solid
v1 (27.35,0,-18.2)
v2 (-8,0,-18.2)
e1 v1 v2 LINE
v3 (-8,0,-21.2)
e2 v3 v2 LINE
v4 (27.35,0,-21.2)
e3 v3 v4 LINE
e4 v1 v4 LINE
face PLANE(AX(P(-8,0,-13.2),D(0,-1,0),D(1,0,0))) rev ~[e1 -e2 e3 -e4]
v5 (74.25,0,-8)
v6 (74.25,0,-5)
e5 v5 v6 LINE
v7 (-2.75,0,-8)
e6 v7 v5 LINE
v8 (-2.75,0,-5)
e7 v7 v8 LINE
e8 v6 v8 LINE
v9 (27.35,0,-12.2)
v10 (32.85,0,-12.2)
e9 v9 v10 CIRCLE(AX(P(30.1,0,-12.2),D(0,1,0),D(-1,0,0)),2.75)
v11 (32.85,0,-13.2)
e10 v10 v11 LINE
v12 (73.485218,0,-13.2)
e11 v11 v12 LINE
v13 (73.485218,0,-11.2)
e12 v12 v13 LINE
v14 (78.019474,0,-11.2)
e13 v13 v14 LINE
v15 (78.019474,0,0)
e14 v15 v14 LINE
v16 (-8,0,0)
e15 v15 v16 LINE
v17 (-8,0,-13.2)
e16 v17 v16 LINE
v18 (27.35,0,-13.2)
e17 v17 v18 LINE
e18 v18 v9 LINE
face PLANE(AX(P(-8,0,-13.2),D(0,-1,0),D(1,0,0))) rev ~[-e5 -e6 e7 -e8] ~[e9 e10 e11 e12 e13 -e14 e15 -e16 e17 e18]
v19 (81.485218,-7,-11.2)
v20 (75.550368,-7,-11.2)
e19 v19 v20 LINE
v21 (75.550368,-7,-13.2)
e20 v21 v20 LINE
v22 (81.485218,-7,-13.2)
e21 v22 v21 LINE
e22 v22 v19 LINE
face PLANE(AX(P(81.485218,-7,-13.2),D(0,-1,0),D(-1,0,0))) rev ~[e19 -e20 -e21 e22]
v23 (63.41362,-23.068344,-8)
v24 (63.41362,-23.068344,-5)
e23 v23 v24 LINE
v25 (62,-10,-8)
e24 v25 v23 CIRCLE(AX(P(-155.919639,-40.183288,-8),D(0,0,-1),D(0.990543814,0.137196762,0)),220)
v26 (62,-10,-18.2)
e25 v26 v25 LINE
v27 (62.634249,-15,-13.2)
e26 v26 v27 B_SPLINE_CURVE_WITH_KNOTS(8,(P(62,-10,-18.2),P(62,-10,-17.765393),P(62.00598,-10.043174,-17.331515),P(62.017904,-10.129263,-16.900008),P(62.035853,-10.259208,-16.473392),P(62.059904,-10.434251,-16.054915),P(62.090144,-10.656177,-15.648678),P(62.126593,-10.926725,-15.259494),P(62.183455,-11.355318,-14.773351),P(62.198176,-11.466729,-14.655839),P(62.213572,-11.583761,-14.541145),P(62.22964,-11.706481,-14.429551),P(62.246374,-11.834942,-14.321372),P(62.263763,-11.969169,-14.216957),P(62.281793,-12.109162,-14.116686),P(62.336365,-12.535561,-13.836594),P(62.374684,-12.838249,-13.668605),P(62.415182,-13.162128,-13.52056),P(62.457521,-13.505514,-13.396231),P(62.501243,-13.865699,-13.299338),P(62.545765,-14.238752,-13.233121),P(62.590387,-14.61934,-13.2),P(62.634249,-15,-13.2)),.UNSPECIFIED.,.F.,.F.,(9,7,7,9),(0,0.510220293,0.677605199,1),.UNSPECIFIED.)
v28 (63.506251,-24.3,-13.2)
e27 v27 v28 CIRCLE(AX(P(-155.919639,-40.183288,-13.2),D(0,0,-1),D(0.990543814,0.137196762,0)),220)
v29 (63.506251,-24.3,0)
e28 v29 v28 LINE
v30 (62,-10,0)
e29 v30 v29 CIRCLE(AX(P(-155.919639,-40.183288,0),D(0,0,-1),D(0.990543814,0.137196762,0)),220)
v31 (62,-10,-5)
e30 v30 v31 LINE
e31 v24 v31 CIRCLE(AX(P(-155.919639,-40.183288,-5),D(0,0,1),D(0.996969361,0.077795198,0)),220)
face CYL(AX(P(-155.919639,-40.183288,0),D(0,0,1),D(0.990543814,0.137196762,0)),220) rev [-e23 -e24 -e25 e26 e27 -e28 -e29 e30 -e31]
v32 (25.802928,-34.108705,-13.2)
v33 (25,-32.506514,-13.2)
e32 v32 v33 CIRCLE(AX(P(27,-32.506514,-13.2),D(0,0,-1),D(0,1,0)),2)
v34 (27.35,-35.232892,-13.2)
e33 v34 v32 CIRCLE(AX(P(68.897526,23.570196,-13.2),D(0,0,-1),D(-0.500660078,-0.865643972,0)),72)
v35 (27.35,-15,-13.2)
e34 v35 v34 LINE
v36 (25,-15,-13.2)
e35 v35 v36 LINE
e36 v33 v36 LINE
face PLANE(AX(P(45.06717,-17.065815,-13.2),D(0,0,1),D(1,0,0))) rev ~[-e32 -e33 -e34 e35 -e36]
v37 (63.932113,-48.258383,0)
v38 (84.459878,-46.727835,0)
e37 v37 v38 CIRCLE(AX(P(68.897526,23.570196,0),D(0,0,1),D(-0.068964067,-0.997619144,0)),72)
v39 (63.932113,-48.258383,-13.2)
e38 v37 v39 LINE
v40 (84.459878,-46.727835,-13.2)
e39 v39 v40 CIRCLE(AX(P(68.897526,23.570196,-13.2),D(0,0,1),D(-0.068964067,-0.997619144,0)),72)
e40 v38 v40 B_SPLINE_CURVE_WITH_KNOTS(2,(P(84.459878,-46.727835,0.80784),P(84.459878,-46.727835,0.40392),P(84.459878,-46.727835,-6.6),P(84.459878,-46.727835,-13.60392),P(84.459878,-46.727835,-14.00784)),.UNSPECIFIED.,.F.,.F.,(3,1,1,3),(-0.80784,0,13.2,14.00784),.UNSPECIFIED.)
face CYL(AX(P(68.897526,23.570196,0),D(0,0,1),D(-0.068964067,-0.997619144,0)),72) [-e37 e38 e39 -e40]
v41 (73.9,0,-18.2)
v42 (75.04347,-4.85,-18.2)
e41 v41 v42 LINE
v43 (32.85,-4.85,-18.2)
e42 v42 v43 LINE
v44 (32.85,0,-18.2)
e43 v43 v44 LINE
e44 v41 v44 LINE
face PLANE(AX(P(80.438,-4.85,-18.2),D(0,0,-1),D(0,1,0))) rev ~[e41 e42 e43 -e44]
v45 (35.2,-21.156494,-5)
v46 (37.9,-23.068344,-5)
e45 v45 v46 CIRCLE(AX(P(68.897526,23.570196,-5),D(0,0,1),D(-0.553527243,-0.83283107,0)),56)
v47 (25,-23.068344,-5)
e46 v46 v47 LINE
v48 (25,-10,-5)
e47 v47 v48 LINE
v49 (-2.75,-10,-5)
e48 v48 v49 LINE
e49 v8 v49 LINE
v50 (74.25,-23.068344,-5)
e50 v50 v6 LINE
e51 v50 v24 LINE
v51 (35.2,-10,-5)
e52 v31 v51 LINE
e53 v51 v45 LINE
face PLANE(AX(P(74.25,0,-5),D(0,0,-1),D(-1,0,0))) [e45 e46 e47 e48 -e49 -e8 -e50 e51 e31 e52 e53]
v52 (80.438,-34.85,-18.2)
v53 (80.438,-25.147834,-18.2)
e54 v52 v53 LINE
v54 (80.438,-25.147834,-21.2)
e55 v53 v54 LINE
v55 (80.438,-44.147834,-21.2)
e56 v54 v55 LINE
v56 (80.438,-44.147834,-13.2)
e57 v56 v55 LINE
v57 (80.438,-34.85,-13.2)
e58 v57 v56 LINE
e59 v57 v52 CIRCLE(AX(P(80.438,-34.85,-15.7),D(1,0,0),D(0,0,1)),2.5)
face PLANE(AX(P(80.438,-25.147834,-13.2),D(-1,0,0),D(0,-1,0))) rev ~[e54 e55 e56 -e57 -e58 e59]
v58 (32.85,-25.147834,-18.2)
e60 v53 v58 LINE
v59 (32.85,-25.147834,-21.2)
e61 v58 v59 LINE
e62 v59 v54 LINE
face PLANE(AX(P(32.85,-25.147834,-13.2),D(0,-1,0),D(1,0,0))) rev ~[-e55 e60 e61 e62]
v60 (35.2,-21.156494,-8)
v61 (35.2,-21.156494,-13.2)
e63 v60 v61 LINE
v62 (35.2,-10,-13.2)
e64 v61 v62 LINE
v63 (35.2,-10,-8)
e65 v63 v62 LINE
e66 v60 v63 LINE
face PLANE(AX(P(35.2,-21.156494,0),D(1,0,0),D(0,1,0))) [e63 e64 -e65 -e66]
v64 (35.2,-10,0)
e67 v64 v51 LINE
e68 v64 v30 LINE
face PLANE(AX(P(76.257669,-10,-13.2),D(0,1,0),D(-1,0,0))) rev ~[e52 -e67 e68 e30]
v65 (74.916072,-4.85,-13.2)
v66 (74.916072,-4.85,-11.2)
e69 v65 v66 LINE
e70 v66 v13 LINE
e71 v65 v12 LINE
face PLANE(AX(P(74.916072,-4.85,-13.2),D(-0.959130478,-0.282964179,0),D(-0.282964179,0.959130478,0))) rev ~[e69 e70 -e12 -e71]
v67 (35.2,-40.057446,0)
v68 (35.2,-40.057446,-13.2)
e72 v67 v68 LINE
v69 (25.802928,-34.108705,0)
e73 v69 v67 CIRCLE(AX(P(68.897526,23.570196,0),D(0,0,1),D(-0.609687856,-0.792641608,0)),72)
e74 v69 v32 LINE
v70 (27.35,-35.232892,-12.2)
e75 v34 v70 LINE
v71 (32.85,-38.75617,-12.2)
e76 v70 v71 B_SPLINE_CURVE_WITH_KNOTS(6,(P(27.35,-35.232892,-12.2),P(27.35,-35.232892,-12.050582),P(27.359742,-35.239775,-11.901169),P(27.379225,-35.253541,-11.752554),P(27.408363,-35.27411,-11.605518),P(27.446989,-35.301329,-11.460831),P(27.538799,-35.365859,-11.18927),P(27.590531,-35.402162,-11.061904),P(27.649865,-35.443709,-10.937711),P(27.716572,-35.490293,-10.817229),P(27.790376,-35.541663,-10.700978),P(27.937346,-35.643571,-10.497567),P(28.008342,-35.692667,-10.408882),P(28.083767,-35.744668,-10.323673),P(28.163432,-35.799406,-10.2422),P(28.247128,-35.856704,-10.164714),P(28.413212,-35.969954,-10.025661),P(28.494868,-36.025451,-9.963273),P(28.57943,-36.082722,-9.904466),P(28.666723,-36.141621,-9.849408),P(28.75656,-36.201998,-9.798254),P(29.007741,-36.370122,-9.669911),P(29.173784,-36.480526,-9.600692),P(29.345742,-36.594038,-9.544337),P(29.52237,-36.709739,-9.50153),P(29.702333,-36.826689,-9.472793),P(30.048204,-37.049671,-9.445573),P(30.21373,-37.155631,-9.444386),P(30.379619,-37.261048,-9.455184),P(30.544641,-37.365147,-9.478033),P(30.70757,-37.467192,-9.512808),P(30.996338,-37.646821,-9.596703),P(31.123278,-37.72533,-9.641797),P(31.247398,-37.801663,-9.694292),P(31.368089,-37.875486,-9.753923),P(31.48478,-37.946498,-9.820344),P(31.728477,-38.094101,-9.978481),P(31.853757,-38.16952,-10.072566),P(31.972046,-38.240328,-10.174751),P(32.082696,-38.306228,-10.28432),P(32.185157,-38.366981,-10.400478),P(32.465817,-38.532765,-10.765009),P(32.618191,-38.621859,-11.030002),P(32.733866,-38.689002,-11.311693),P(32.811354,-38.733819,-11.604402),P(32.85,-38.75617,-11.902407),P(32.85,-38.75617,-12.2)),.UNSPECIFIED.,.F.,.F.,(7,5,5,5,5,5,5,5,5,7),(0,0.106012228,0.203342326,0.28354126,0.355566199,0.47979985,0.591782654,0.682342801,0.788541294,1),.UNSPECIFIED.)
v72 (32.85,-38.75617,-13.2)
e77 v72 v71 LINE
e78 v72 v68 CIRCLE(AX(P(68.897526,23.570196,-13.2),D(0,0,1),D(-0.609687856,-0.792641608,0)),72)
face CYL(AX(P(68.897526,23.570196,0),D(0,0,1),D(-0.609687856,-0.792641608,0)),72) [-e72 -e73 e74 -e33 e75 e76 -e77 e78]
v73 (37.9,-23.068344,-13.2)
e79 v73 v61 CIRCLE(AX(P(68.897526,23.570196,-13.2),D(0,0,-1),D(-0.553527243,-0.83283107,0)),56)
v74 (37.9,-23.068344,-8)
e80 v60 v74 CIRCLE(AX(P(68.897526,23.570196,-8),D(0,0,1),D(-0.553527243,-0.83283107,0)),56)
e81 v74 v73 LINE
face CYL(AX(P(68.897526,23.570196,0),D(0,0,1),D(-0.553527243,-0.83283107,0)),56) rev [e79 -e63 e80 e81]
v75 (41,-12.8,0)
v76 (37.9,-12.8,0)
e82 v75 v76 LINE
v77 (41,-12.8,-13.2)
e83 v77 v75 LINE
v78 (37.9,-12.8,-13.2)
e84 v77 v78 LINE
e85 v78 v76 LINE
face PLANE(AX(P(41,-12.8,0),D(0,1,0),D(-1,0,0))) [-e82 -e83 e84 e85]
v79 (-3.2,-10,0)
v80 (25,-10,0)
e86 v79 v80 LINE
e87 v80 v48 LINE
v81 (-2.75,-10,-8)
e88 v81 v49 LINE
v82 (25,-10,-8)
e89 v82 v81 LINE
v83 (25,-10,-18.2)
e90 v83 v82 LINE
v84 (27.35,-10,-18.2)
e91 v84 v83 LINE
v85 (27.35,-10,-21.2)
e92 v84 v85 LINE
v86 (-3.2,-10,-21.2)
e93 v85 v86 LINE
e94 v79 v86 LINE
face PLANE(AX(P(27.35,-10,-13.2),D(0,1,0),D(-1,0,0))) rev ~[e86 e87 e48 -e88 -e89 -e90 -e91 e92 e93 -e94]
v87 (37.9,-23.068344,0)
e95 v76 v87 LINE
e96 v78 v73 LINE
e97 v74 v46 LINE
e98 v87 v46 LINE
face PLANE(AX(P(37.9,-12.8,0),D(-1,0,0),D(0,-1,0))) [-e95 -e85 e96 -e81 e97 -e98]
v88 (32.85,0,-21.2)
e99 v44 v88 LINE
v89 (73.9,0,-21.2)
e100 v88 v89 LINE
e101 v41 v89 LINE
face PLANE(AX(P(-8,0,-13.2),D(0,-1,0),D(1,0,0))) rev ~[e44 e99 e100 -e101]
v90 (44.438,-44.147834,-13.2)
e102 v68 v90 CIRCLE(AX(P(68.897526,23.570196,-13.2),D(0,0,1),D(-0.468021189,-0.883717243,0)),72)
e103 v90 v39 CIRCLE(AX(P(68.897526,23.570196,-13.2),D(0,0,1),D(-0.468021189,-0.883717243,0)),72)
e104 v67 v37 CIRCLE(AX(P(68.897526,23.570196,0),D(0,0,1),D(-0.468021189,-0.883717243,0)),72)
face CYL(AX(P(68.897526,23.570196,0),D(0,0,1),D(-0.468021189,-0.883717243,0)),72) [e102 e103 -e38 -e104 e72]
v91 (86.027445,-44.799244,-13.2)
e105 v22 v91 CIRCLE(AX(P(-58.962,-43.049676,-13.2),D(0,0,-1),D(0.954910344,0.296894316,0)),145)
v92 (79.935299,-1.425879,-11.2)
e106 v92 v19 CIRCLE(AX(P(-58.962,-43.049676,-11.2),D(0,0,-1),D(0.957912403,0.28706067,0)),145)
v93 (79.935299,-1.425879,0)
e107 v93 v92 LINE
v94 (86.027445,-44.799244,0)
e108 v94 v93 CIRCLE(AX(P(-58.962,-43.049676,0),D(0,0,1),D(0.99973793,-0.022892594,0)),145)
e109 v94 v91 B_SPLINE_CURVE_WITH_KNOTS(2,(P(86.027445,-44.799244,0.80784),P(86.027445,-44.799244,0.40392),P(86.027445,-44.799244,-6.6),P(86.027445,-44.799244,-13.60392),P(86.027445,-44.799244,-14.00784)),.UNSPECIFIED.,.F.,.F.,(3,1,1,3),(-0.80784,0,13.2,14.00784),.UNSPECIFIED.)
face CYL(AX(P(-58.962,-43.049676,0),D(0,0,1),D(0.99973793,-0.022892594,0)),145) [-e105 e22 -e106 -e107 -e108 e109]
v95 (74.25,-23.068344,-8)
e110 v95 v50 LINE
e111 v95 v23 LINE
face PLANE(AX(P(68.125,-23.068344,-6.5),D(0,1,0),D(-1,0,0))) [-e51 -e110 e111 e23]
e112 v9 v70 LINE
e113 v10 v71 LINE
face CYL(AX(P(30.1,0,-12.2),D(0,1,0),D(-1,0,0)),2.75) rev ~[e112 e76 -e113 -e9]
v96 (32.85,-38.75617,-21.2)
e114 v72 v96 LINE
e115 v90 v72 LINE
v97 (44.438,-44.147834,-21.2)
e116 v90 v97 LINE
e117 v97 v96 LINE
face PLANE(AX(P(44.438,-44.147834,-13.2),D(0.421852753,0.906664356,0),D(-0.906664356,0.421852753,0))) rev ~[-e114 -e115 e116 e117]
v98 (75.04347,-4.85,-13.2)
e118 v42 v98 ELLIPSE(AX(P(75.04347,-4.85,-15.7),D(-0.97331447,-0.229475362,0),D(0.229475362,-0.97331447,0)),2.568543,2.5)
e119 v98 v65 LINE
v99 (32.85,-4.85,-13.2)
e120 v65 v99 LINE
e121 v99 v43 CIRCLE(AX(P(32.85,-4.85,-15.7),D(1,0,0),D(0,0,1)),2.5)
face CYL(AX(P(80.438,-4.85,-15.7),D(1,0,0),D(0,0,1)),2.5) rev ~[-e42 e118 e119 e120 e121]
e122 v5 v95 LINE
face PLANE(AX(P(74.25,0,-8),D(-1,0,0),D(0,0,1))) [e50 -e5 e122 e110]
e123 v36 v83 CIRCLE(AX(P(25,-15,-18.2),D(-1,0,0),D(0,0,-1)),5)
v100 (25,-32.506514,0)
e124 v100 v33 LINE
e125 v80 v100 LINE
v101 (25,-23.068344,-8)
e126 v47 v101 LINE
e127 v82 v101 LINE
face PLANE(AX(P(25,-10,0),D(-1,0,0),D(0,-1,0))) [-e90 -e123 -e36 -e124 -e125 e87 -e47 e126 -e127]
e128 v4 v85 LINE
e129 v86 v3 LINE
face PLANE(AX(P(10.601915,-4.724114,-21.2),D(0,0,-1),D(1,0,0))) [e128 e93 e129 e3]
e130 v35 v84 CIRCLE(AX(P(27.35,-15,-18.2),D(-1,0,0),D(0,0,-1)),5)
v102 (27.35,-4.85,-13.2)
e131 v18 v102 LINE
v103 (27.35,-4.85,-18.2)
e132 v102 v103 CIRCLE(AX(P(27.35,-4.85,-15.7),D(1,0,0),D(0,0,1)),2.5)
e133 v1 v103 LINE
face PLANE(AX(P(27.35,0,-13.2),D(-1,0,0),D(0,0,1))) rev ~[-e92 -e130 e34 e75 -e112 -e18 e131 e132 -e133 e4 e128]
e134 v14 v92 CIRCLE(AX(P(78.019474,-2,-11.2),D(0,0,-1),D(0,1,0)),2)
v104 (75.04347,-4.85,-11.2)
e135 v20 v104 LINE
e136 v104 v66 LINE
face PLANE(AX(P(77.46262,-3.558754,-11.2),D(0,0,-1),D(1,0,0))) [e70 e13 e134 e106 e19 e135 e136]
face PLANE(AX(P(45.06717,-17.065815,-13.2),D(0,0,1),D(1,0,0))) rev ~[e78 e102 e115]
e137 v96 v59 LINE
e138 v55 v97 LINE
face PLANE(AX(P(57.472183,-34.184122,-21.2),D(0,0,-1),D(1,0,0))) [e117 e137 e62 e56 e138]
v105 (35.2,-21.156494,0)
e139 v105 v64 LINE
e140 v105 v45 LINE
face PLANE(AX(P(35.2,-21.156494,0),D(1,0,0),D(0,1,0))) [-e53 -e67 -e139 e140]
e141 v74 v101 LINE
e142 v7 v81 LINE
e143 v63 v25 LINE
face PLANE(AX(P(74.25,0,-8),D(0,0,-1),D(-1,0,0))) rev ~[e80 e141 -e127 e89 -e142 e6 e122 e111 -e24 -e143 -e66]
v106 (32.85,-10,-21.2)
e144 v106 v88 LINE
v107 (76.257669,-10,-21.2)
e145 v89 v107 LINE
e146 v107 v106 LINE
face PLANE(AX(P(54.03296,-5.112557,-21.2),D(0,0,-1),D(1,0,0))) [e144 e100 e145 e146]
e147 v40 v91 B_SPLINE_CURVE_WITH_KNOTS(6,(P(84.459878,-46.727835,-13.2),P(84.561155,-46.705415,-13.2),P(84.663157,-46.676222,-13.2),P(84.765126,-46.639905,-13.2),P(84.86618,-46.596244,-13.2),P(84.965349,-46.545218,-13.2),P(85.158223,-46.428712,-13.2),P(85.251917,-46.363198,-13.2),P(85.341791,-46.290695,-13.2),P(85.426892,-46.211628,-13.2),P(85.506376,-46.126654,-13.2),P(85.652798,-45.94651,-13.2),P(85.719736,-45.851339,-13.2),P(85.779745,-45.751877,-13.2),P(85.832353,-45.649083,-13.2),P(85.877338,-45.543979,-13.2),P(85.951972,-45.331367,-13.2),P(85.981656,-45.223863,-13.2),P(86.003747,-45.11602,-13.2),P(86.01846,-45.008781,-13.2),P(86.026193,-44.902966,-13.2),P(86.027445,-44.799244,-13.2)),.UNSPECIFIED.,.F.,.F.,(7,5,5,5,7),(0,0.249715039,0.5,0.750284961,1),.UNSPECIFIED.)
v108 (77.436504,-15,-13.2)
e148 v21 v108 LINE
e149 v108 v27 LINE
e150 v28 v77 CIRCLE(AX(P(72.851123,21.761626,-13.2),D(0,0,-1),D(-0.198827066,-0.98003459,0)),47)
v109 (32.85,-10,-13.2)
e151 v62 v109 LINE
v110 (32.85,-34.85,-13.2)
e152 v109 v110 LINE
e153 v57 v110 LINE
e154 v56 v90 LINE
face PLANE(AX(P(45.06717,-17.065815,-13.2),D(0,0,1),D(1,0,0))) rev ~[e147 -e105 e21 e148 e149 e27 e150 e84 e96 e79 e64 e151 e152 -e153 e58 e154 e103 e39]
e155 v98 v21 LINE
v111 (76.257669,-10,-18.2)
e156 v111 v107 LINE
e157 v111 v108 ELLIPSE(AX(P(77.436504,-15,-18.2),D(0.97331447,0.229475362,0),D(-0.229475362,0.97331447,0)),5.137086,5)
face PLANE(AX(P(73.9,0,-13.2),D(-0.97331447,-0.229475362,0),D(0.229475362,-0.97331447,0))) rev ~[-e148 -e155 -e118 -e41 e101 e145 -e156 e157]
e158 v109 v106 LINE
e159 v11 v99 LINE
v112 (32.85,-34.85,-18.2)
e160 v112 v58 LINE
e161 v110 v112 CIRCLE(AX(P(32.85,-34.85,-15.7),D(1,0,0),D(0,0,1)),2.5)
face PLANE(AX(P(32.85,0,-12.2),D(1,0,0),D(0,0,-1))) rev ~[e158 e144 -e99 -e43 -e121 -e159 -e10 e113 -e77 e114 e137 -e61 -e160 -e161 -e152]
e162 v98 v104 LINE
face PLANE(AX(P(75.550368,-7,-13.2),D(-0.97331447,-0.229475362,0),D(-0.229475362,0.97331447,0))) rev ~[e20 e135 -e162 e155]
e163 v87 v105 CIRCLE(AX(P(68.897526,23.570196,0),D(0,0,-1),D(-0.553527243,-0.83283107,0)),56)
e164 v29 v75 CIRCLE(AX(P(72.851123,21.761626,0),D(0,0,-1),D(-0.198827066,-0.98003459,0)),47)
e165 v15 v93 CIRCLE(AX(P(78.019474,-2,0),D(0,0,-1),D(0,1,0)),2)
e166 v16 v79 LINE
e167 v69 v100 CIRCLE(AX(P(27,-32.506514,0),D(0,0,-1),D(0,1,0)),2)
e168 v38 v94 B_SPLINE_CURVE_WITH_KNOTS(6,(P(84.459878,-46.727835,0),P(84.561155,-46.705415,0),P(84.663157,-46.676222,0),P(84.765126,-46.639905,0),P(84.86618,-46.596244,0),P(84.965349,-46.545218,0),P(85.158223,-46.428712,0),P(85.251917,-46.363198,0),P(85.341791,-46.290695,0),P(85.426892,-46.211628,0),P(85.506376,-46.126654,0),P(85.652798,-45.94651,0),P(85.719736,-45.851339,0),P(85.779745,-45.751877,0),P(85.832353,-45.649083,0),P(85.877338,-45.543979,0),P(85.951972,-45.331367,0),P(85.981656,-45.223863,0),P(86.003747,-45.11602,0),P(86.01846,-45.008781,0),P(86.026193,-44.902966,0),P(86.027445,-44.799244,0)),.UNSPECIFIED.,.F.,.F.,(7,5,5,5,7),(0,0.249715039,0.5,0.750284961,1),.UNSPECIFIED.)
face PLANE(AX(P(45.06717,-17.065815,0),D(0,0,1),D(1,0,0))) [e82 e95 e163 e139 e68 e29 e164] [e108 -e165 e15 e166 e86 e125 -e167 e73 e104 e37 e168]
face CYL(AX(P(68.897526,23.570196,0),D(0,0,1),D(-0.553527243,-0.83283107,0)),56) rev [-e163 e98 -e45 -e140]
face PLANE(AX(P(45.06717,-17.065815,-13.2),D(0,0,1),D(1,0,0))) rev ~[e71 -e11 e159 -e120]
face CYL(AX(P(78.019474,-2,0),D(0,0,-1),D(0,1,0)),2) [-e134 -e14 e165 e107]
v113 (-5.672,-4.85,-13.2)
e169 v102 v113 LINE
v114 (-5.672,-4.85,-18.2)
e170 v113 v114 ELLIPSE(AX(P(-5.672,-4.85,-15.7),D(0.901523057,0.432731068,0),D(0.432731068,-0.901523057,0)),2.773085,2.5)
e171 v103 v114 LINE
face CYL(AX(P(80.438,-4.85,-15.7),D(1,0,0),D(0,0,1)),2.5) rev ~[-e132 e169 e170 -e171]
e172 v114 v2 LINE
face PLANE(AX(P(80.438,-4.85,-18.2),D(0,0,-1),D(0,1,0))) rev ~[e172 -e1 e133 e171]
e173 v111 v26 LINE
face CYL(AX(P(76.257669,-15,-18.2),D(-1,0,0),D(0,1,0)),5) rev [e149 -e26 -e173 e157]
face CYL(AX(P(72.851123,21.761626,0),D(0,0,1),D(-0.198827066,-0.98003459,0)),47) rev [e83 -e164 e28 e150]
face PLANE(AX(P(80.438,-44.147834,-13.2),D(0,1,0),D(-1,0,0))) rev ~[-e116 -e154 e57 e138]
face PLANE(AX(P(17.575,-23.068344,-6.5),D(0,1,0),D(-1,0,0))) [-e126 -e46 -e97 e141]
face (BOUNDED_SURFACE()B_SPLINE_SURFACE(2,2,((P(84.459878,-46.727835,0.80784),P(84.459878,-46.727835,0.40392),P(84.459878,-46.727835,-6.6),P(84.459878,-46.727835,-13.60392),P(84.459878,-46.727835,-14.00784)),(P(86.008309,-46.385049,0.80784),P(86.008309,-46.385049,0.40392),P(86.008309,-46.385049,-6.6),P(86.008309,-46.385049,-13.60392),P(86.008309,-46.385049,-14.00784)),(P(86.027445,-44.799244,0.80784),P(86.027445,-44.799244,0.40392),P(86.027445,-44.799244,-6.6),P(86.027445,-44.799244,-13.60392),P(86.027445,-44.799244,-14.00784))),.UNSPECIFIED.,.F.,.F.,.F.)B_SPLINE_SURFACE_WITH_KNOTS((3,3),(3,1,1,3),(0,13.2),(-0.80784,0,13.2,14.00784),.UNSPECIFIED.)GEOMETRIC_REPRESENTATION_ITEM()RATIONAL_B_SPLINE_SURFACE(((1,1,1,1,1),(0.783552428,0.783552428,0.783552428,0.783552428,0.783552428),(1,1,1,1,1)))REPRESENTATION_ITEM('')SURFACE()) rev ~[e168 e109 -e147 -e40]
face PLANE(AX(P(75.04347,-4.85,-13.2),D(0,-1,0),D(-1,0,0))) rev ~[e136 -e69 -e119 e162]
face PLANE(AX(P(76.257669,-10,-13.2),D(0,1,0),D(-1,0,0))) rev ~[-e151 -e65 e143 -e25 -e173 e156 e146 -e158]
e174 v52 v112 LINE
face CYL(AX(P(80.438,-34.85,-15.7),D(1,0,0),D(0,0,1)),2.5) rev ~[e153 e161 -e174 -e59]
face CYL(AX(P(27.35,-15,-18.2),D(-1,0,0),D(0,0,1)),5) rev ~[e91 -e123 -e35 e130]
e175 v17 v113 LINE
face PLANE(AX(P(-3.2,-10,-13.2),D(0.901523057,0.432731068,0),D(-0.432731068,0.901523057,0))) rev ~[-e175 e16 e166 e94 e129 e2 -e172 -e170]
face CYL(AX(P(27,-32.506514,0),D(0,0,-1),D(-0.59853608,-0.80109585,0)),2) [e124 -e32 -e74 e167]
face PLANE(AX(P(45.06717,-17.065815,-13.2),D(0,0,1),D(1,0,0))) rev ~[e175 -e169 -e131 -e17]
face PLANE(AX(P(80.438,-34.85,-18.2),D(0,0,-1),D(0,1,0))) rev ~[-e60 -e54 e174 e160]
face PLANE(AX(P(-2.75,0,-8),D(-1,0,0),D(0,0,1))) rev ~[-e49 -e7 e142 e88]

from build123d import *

# Parameters (mm, degrees)
F1_DEPTH  = 13.2
F3_DEPTH  = 8
F5_DEPTH  = 88.4390001176
F7_DEPTH  = 48.4308042409
F6_W      = 77
F6_H      = 3
F8_DEPTH  = 12.8
F9_R      = 5
F10_R     = 2
F12_DEPTH = 2
F13_W     = 40.65
F13_H     = 3
F13_W_2   = 12.25
F14_DEPTH = 23.0683441528


# Not quite as in the source:
# - a feature names something its author has since deleted; it is built from what else it names


with BuildPart() as f1:
    # F0 (on Top) → F1 (new body)
    with BuildSketch(Plane.XY):
        with BuildLine():
            Line((-3.2, -10), (4.8, -10))
            Line((4.8, -10), (25, -10))
            Line((25, -10), (25, -33.5))
            ThreePointArc((25, -33.5), (29.9617064043, -36.9938363193), (35.2, -40.0574457714))
            Line((35.2, -40.0574457714), (35.2, -21.1564938874))
            Line((35.2, -21.1564938874), (35.2, -10))
            Line((35.2, -10), (62, -10))
            ThreePointArc((62, -10), (62.8699868465, -17.1376907215), (63.5062507441, -24.3))
            ThreePointArc((63.5062507441, -24.3), (63.7566330876, -28.252847646), (63.9358126513, -32.2095622573))
            ThreePointArc((63.9358126513, -32.2095622573), (64.0273561468, -35.3542873695), (64.0739210442, -38.5))
            ThreePointArc((64.0739210442, -38.5), (64.0571349812, -43.3799777622), (63.9321127792, -48.258382643))
            ThreePointArc((63.9321127792, -48.258382643), (75.0391386854, -48.167385668), (86, -46.3691019944))
            ThreePointArc((86, -46.3691019944), (84.6340109104, -22.9204511896), (79.5, 0))
            Line((79.5, 0), (0, 0))
            Line((0, 0), (-8, 0))
            Line((-8, 0), (-3.2, -10))
        make_face()
        with BuildLine():
            Line((35.2, -21.1564938874), (35.2, -40.0574457714))
            ThreePointArc((35.2, -40.0574457714), (49.1359582734, -45.6647697988), (63.9321127792, -48.258382643))
            ThreePointArc((63.9321127792, -48.258382643), (64.0571349812, -43.3799777622), (64.0739210442, -38.5))
            ThreePointArc((64.0739210442, -38.5), (50.2282447294, -34.8385677857), (37.9, -27.55))
            Line((37.9, -27.55), (37.9, -23.0683441528))
            ThreePointArc((37.9, -23.0683441528), (36.5358784648, -22.1323620803), (35.2, -21.1564938874))
        make_face()
        with BuildLine():
            Line((37.9, -12.8), (37.9, -23.0683441528))
            ThreePointArc((37.9, -23.0683441528), (50.346051903, -29.2676961626), (63.9358126513, -32.2095622573))
            ThreePointArc((63.9358126513, -32.2095622573), (63.7566330876, -28.252847646), (63.5062507441, -24.3))
            ThreePointArc((63.5062507441, -24.3), (51.465613735, -20.0912116842), (41, -12.8))
            Line((41, -12.8), (37.9, -12.8))
        make_face()
        with BuildLine():
            ThreePointArc((63.9358126513, -32.2095622573), (50.346051903, -29.2676961626), (37.9, -23.0683441528))
            Line((37.9, -23.0683441528), (37.9, -27.55))
            ThreePointArc((37.9, -27.55), (50.2282447294, -34.8385677857), (64.0739210442, -38.5))
            ThreePointArc((64.0739210442, -38.5), (64.0273561468, -35.3542873695), (63.9358126513, -32.2095622573))
        make_face()
    extrude(amount=-F1_DEPTH)

    # F2 (on face) → F3 (join)
    with BuildSketch(Plane(origin=(0, 0, -13.2), x_dir=(1, 0, 0), z_dir=(0, 0, -1))):
        Polygon((0.35, 0), (27.35, 0), (27.35, 10), (25, 10), (-3.2, 10), (-8, 0), align=None)
        Polygon((32.85, 10), (32.85, 0), (73.9, 0), (76.2576692783, 10), (62, 10), (35.2, 10), align=None)
        Polygon((32.85, 25.1478344245), (80.4380001176, 25.1478344245), (80.4380001176, 44.1478344245), (44.4380001176, 44.1478344245), (32.85, 38.7561702211), align=None)
    extrude(amount=F3_DEPTH)

    # F4 (on face) → F5 (cut, through all)
    with BuildSketch(Plane.YZ.offset(80.4380001176)):
        with BuildLine():
            Line((0, -18.2), (0, -13.2))
            Line((0, -13.2), (-4.85, -13.2))
            ThreePointArc((-4.85, -13.2), (-7.35, -15.7), (-4.85, -18.2))
            Line((-4.85, -18.2), (0, -18.2))
        make_face()
        with BuildLine():
            Line((-34.85, -18.2), (-30, -18.2))
            Line((-30, -18.2), (-25.1478344245, -18.2))
            Line((-25.1478344245, -18.2), (-25.1478344245, -13.2))
            Line((-25.1478344245, -13.2), (-30, -13.2))
            Line((-30, -13.2), (-34.85, -13.2))
            ThreePointArc((-34.85, -13.2), (-37.35, -15.7), (-34.85, -18.2))
        make_face()
    extrude(amount=-F5_DEPTH, mode=Mode.SUBTRACT)

    # F6 (on face) → F7 (cut, through all)
    with BuildSketch(Plane(origin=(0, 0, 0), x_dir=(-1, 0, 0), z_dir=(0, 1, 0))):
        with BuildLine():
            Line((-32.85, -13.2), (-27.35, -13.2))
            Line((-27.35, -13.2), (-27.35, -12.2))
            ThreePointArc((-27.35, -12.2), (-30.1, -9.45), (-32.85, -12.2))
            Line((-32.85, -12.2), (-32.85, -13.2))
        make_face()
    extrude(amount=-F7_DEPTH, mode=Mode.SUBTRACT)

    # F6 (on face) → F8 (cut, through all)
    with BuildSketch(Plane(origin=(0, 0, 0), x_dir=(-1, 0, 0), z_dir=(0, 1, 0))):
        with Locations((-35.75, -6.5)):
            Rectangle(F6_W, F6_H)
    extrude(amount=-F8_DEPTH, mode=Mode.SUBTRACT)

    # F9
    f9_edges = [f1.edges().sort_by_distance(p)[0] for p in [
        (69.128835, -10, -13.2),
        (26.175, -10, -13.2),
    ]]
    fillet(f9_edges, radius=F9_R)

    # F10
    f10_edges = [f1.edges().sort_by_distance(p)[0] for p in [
        (86, -46.369102, -6.6),
        (79.5, 0, -6.6),
        (25, -33.5, -6.6),
    ]]
    fillet(f10_edges, radius=F10_R)

    # F11 (on face) → F12 (cut)
    with BuildSketch(Plane(origin=(0, 0, -13.2), x_dir=(1, 0, 0), z_dir=(0, 0, -1))):
        with BuildLine():
            Line((73.4852175089, 0), (78.0194737362, 0))
            ThreePointArc((78.0194737362, 0), (79.2135753482, 0.39559315), (79.9352985421, 1.4258786598))
            ThreePointArc((79.9352985421, 1.4258786598), (80.7380621658, 4.2052082165), (81.4852175089, 7))
            Line((81.4852175089, 7), (75.5503684948, 7))
            Line((75.5503684948, 7), (75.0434696, 4.85))
            Line((75.0434696, 4.85), (74.9160721206, 4.85))
            Line((74.9160721206, 4.85), (73.4852175089, 0))
        make_face()
    extrude(amount=-F12_DEPTH, mode=Mode.SUBTRACT)

    # F13 (on face) → F14 (cut, through all)
    with BuildSketch(Plane(origin=(0, 0, 0), x_dir=(-1, 0, 0), z_dir=(0, 1, 0))):
        with Locations((-17.575, -6.5)):
            Rectangle(F13_W, F13_H)
        with Locations((-68.125, -6.5)):
            Rectangle(F13_W_2, F13_H)
    extrude(amount=-F14_DEPTH, mode=Mode.SUBTRACT)


solid = f1.part
